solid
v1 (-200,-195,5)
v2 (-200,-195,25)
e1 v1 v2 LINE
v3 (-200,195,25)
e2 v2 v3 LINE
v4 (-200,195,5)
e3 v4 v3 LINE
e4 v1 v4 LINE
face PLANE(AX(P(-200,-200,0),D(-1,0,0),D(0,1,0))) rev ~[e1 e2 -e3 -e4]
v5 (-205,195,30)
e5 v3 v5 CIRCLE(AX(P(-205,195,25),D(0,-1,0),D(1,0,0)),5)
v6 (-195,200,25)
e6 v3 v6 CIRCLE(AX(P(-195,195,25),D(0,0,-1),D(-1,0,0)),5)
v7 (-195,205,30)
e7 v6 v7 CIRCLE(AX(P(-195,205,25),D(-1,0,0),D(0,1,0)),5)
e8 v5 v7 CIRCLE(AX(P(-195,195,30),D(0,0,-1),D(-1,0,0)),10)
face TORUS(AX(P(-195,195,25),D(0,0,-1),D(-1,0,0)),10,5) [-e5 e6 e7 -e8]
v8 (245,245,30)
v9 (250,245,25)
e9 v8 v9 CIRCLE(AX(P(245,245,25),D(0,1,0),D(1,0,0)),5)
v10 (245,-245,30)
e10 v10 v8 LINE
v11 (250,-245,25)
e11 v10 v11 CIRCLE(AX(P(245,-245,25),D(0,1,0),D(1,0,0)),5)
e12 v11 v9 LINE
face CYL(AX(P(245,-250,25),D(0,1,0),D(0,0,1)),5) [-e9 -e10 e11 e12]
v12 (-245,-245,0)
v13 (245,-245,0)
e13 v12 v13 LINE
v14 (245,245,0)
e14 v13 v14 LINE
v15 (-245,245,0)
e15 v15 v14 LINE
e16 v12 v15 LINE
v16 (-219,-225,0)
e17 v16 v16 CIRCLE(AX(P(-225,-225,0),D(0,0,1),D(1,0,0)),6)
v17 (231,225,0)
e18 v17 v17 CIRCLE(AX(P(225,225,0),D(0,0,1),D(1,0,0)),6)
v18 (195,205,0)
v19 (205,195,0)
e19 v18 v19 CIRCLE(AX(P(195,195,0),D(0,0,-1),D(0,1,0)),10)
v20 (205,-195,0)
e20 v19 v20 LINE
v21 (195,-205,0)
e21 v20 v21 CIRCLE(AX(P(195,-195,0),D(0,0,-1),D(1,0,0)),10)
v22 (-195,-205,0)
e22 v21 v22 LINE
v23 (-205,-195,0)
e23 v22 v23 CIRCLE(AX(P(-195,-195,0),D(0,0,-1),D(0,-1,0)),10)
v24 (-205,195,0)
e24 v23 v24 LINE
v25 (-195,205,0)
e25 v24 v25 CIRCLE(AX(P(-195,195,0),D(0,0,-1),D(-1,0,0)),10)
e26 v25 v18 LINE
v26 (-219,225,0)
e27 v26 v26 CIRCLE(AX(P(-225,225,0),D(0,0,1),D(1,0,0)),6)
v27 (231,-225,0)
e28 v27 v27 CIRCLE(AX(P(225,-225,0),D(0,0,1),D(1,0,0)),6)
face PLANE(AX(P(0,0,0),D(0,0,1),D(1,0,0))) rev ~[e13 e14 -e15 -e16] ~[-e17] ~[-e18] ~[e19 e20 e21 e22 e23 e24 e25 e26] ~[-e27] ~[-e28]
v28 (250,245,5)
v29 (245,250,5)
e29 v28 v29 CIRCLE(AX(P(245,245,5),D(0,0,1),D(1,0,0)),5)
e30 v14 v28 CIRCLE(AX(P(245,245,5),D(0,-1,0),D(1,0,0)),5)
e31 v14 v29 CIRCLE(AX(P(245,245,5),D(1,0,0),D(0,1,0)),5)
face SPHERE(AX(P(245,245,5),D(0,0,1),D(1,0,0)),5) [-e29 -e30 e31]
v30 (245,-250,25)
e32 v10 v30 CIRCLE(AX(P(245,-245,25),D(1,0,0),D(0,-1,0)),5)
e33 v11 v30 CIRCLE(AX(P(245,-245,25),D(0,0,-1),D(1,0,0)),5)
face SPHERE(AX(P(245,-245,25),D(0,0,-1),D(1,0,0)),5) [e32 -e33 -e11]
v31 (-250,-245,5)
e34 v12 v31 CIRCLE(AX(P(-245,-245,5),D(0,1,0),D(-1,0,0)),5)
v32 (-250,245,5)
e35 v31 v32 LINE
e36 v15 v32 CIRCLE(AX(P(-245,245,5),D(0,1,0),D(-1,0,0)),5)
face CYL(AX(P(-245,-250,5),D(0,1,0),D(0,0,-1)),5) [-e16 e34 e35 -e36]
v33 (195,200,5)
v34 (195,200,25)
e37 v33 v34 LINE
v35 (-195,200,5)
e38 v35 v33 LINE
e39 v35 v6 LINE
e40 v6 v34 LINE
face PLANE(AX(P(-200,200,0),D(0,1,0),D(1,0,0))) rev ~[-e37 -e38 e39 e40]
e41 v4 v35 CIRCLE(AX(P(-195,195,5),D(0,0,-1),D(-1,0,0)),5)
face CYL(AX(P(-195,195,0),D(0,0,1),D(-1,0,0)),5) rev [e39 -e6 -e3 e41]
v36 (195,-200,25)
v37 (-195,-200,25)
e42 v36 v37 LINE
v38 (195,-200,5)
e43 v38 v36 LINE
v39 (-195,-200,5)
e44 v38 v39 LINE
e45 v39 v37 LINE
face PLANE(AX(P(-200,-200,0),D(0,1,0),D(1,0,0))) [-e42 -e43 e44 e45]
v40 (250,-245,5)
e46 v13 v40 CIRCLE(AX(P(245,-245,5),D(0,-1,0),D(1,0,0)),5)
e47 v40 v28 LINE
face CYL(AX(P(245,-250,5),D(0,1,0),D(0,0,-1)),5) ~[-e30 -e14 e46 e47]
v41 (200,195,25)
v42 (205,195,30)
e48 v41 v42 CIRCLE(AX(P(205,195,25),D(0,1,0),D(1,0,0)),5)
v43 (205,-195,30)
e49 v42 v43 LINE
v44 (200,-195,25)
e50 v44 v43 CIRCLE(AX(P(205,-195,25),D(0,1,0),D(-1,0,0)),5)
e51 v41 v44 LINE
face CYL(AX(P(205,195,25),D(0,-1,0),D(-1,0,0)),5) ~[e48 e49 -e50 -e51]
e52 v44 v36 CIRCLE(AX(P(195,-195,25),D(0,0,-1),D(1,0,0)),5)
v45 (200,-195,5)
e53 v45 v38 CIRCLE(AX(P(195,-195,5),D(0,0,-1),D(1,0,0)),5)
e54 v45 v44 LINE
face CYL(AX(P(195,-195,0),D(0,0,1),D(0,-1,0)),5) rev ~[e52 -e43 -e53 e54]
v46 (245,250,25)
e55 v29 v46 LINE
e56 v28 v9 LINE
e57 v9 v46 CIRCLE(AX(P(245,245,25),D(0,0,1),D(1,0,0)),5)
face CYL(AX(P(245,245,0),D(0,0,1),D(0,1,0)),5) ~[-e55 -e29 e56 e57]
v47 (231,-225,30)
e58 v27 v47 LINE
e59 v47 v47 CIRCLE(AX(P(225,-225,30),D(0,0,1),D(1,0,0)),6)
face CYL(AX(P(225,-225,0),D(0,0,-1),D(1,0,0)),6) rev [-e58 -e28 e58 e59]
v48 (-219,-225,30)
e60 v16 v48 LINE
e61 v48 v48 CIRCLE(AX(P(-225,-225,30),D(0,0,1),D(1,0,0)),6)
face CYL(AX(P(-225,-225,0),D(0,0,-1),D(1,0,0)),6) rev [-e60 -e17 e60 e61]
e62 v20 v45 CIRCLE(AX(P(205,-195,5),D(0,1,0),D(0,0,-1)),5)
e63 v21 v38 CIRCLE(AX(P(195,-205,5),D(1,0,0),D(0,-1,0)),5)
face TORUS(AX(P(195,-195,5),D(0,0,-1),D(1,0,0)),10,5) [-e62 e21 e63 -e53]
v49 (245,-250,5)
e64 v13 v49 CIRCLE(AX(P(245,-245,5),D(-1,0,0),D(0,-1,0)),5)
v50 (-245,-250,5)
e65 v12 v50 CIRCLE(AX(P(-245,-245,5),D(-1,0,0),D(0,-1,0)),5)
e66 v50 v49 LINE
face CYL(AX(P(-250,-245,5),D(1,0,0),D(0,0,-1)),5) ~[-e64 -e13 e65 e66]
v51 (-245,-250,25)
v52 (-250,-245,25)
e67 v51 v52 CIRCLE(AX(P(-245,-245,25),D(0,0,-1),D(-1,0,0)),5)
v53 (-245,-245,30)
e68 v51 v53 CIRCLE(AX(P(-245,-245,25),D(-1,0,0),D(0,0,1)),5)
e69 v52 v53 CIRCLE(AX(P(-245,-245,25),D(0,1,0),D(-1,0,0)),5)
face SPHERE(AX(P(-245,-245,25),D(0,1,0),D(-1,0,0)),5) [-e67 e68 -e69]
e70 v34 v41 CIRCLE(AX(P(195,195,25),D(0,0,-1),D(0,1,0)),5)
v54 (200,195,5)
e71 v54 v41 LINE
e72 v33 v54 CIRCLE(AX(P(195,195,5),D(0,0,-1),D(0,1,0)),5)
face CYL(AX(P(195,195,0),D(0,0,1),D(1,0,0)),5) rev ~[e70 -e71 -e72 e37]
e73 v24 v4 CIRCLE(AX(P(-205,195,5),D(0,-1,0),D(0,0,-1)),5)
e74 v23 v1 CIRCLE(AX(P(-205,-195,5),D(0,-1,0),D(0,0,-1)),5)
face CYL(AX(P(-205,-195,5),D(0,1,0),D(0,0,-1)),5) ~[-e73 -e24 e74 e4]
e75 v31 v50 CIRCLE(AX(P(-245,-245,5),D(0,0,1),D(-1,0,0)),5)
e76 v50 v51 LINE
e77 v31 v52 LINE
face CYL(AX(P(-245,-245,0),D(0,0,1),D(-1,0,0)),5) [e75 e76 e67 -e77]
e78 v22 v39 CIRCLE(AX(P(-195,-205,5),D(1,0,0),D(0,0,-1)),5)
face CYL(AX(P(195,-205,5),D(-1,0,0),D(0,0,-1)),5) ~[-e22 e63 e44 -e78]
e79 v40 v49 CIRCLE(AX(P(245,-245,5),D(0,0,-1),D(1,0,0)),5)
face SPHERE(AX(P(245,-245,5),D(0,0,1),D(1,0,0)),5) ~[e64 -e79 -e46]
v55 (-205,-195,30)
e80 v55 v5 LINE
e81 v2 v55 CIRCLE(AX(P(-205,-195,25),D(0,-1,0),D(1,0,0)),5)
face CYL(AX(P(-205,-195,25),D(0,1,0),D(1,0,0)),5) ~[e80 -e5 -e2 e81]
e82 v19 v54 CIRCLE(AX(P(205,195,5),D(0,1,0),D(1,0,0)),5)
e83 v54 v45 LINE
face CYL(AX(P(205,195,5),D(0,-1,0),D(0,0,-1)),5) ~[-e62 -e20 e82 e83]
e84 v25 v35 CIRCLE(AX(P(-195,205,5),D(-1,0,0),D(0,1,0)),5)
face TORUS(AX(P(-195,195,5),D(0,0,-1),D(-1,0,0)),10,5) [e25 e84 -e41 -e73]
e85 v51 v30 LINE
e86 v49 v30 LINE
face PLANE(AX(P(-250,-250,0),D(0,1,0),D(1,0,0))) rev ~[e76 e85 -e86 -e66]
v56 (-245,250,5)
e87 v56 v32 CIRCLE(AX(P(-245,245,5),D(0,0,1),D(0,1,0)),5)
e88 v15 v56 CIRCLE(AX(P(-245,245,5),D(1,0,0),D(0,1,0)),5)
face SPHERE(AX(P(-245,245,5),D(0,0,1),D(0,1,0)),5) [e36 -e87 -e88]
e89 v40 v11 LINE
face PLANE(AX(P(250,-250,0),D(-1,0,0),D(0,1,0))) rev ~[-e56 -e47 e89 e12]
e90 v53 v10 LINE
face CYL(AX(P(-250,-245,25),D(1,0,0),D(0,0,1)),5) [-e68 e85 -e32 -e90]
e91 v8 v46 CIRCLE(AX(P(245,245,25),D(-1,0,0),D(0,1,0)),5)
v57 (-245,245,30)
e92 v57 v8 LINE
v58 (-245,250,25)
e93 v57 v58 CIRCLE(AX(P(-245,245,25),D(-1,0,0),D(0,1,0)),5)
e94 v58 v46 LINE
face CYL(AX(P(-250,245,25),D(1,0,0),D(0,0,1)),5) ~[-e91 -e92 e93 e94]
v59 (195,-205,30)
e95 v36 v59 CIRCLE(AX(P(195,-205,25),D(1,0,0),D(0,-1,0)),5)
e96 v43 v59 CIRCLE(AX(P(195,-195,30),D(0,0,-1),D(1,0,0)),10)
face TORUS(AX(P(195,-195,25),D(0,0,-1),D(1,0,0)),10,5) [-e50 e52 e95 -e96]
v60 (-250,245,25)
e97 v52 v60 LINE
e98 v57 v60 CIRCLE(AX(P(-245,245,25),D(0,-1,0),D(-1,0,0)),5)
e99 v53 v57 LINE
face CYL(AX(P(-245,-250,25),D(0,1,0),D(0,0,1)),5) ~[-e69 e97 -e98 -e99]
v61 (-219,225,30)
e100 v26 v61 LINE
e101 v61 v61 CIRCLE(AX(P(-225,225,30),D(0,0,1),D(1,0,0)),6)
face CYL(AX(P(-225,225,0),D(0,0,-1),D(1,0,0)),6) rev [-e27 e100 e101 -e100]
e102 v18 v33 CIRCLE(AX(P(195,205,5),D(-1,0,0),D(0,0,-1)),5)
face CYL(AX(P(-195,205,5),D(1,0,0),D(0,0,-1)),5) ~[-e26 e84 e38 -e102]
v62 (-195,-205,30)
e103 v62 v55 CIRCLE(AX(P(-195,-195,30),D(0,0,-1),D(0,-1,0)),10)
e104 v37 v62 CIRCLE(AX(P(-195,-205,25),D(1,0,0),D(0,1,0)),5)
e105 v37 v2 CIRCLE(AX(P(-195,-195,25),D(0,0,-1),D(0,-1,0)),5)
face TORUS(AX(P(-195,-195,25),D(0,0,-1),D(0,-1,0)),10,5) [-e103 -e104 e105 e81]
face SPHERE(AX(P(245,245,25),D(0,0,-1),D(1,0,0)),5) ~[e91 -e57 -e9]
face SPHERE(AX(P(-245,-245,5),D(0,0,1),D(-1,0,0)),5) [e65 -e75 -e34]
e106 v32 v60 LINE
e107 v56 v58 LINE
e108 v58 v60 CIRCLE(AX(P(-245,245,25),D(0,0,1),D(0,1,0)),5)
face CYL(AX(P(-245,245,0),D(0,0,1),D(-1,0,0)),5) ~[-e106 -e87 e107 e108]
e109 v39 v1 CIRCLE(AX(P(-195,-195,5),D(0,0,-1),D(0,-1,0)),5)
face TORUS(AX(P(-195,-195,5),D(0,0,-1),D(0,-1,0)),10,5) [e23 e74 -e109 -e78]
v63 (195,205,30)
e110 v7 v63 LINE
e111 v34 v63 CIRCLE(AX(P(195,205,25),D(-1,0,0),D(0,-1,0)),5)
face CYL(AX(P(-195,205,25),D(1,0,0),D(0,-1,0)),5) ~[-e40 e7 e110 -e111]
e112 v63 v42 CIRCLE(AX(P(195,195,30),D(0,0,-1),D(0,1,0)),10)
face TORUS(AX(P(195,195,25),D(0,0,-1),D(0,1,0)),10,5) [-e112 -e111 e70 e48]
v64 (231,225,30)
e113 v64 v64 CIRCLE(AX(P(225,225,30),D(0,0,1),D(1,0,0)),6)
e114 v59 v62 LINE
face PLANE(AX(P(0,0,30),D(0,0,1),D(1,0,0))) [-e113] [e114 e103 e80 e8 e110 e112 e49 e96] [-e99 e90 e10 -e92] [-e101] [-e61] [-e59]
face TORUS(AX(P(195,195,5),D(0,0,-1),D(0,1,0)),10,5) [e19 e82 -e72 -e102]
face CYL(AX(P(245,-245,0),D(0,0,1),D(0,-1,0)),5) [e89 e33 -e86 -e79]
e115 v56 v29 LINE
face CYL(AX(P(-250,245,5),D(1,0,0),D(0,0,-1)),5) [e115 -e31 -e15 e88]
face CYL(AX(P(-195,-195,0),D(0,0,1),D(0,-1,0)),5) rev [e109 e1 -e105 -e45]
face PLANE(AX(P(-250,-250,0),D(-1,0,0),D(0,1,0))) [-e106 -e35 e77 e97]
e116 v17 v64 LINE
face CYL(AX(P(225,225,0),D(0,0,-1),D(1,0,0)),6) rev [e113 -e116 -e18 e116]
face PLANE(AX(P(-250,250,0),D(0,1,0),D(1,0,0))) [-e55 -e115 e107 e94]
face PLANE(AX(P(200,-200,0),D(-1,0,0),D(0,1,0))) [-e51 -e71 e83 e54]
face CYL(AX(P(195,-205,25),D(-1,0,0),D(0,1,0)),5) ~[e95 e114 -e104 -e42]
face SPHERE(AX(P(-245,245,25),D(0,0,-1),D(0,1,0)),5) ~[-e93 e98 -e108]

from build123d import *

# Parameters (mm, degrees)
F0_W     = 500
F0_H     = 500
F0_R     = 6
F0_W_2   = 400
F0_H_2   = 400
F1_DEPTH = 30
F6_F1_R  = 5
F6_F2_R  = 5
F6_F3_R  = 5


with BuildPart() as f1:
    # F0 (on Top) → F1 (new body)
    with BuildSketch(Plane.XY):
        Rectangle(F0_W, F0_H)
        with Locations((-225, -225)):
            Circle(F0_R, mode=Mode.SUBTRACT)
        with Locations((225, -225)):
            Circle(F0_R, mode=Mode.SUBTRACT)
        with Locations((-225, 225)):
            Circle(F0_R, mode=Mode.SUBTRACT)
        Rectangle(F0_W_2, F0_H_2, mode=Mode.SUBTRACT)
        with Locations((225, 225)):
            Circle(F0_R, mode=Mode.SUBTRACT)
    extrude(amount=F1_DEPTH)

    # F6: fillet of radius 5 on 22 edges, made by hand

    # F6_f1
    f6_f1_edges = [f1.edges().sort_by_distance(p)[0] for p in [
        (-200, -200, 15),
        (-200, 200, 15),
        (200, 200, 15),
        (200, -200, 15),
    ]]
    fillet(f6_f1_edges, radius=F6_F1_R)

    # F6_f2
    f6_f2_edges = [f1.edges().sort_by_distance(p)[0] for p in [
        (250, -250, 15),
        (250, 250, 15),
        (250, 0, 0),
        (250, 0, 30),
        (-250, 250, 15),
        (0, 250, 0),
        (0, 250, 30),
        (-250, 0, 30),
        (-250, -250, 15),
        (-250, 0, 0),
        (0, -250, 0),
        (0, -250, 30),
    ]]
    fillet(f6_f2_edges, radius=F6_F2_R)

    # F6_f3
    f6_f3_edges = [f1.edges().sort_by_distance(p)[0] for p in [
        (-200, 0, 0),
        (-200, 0, 30),
        (0, 200, 0),
        (0, 200, 30),
        (0, -200, 0),
        (0, -200, 30),
        (198.5355339059, -198.5355339059, 30),
        (-198.5355339059, -198.5355339059, 30),
        (198.5355339059, -198.5355339059, 0),
        (-198.5355339059, -198.5355339059, 0),
        (-198.5355339059, 198.5355339059, 30),
        (198.5355339059, 198.5355339059, 30),
        (-198.5355339059, 198.5355339059, 0),
        (198.5355339059, 198.5355339059, 0),
    ]]
    fillet(f6_f3_edges, radius=F6_F3_R)


solid = f1.part
